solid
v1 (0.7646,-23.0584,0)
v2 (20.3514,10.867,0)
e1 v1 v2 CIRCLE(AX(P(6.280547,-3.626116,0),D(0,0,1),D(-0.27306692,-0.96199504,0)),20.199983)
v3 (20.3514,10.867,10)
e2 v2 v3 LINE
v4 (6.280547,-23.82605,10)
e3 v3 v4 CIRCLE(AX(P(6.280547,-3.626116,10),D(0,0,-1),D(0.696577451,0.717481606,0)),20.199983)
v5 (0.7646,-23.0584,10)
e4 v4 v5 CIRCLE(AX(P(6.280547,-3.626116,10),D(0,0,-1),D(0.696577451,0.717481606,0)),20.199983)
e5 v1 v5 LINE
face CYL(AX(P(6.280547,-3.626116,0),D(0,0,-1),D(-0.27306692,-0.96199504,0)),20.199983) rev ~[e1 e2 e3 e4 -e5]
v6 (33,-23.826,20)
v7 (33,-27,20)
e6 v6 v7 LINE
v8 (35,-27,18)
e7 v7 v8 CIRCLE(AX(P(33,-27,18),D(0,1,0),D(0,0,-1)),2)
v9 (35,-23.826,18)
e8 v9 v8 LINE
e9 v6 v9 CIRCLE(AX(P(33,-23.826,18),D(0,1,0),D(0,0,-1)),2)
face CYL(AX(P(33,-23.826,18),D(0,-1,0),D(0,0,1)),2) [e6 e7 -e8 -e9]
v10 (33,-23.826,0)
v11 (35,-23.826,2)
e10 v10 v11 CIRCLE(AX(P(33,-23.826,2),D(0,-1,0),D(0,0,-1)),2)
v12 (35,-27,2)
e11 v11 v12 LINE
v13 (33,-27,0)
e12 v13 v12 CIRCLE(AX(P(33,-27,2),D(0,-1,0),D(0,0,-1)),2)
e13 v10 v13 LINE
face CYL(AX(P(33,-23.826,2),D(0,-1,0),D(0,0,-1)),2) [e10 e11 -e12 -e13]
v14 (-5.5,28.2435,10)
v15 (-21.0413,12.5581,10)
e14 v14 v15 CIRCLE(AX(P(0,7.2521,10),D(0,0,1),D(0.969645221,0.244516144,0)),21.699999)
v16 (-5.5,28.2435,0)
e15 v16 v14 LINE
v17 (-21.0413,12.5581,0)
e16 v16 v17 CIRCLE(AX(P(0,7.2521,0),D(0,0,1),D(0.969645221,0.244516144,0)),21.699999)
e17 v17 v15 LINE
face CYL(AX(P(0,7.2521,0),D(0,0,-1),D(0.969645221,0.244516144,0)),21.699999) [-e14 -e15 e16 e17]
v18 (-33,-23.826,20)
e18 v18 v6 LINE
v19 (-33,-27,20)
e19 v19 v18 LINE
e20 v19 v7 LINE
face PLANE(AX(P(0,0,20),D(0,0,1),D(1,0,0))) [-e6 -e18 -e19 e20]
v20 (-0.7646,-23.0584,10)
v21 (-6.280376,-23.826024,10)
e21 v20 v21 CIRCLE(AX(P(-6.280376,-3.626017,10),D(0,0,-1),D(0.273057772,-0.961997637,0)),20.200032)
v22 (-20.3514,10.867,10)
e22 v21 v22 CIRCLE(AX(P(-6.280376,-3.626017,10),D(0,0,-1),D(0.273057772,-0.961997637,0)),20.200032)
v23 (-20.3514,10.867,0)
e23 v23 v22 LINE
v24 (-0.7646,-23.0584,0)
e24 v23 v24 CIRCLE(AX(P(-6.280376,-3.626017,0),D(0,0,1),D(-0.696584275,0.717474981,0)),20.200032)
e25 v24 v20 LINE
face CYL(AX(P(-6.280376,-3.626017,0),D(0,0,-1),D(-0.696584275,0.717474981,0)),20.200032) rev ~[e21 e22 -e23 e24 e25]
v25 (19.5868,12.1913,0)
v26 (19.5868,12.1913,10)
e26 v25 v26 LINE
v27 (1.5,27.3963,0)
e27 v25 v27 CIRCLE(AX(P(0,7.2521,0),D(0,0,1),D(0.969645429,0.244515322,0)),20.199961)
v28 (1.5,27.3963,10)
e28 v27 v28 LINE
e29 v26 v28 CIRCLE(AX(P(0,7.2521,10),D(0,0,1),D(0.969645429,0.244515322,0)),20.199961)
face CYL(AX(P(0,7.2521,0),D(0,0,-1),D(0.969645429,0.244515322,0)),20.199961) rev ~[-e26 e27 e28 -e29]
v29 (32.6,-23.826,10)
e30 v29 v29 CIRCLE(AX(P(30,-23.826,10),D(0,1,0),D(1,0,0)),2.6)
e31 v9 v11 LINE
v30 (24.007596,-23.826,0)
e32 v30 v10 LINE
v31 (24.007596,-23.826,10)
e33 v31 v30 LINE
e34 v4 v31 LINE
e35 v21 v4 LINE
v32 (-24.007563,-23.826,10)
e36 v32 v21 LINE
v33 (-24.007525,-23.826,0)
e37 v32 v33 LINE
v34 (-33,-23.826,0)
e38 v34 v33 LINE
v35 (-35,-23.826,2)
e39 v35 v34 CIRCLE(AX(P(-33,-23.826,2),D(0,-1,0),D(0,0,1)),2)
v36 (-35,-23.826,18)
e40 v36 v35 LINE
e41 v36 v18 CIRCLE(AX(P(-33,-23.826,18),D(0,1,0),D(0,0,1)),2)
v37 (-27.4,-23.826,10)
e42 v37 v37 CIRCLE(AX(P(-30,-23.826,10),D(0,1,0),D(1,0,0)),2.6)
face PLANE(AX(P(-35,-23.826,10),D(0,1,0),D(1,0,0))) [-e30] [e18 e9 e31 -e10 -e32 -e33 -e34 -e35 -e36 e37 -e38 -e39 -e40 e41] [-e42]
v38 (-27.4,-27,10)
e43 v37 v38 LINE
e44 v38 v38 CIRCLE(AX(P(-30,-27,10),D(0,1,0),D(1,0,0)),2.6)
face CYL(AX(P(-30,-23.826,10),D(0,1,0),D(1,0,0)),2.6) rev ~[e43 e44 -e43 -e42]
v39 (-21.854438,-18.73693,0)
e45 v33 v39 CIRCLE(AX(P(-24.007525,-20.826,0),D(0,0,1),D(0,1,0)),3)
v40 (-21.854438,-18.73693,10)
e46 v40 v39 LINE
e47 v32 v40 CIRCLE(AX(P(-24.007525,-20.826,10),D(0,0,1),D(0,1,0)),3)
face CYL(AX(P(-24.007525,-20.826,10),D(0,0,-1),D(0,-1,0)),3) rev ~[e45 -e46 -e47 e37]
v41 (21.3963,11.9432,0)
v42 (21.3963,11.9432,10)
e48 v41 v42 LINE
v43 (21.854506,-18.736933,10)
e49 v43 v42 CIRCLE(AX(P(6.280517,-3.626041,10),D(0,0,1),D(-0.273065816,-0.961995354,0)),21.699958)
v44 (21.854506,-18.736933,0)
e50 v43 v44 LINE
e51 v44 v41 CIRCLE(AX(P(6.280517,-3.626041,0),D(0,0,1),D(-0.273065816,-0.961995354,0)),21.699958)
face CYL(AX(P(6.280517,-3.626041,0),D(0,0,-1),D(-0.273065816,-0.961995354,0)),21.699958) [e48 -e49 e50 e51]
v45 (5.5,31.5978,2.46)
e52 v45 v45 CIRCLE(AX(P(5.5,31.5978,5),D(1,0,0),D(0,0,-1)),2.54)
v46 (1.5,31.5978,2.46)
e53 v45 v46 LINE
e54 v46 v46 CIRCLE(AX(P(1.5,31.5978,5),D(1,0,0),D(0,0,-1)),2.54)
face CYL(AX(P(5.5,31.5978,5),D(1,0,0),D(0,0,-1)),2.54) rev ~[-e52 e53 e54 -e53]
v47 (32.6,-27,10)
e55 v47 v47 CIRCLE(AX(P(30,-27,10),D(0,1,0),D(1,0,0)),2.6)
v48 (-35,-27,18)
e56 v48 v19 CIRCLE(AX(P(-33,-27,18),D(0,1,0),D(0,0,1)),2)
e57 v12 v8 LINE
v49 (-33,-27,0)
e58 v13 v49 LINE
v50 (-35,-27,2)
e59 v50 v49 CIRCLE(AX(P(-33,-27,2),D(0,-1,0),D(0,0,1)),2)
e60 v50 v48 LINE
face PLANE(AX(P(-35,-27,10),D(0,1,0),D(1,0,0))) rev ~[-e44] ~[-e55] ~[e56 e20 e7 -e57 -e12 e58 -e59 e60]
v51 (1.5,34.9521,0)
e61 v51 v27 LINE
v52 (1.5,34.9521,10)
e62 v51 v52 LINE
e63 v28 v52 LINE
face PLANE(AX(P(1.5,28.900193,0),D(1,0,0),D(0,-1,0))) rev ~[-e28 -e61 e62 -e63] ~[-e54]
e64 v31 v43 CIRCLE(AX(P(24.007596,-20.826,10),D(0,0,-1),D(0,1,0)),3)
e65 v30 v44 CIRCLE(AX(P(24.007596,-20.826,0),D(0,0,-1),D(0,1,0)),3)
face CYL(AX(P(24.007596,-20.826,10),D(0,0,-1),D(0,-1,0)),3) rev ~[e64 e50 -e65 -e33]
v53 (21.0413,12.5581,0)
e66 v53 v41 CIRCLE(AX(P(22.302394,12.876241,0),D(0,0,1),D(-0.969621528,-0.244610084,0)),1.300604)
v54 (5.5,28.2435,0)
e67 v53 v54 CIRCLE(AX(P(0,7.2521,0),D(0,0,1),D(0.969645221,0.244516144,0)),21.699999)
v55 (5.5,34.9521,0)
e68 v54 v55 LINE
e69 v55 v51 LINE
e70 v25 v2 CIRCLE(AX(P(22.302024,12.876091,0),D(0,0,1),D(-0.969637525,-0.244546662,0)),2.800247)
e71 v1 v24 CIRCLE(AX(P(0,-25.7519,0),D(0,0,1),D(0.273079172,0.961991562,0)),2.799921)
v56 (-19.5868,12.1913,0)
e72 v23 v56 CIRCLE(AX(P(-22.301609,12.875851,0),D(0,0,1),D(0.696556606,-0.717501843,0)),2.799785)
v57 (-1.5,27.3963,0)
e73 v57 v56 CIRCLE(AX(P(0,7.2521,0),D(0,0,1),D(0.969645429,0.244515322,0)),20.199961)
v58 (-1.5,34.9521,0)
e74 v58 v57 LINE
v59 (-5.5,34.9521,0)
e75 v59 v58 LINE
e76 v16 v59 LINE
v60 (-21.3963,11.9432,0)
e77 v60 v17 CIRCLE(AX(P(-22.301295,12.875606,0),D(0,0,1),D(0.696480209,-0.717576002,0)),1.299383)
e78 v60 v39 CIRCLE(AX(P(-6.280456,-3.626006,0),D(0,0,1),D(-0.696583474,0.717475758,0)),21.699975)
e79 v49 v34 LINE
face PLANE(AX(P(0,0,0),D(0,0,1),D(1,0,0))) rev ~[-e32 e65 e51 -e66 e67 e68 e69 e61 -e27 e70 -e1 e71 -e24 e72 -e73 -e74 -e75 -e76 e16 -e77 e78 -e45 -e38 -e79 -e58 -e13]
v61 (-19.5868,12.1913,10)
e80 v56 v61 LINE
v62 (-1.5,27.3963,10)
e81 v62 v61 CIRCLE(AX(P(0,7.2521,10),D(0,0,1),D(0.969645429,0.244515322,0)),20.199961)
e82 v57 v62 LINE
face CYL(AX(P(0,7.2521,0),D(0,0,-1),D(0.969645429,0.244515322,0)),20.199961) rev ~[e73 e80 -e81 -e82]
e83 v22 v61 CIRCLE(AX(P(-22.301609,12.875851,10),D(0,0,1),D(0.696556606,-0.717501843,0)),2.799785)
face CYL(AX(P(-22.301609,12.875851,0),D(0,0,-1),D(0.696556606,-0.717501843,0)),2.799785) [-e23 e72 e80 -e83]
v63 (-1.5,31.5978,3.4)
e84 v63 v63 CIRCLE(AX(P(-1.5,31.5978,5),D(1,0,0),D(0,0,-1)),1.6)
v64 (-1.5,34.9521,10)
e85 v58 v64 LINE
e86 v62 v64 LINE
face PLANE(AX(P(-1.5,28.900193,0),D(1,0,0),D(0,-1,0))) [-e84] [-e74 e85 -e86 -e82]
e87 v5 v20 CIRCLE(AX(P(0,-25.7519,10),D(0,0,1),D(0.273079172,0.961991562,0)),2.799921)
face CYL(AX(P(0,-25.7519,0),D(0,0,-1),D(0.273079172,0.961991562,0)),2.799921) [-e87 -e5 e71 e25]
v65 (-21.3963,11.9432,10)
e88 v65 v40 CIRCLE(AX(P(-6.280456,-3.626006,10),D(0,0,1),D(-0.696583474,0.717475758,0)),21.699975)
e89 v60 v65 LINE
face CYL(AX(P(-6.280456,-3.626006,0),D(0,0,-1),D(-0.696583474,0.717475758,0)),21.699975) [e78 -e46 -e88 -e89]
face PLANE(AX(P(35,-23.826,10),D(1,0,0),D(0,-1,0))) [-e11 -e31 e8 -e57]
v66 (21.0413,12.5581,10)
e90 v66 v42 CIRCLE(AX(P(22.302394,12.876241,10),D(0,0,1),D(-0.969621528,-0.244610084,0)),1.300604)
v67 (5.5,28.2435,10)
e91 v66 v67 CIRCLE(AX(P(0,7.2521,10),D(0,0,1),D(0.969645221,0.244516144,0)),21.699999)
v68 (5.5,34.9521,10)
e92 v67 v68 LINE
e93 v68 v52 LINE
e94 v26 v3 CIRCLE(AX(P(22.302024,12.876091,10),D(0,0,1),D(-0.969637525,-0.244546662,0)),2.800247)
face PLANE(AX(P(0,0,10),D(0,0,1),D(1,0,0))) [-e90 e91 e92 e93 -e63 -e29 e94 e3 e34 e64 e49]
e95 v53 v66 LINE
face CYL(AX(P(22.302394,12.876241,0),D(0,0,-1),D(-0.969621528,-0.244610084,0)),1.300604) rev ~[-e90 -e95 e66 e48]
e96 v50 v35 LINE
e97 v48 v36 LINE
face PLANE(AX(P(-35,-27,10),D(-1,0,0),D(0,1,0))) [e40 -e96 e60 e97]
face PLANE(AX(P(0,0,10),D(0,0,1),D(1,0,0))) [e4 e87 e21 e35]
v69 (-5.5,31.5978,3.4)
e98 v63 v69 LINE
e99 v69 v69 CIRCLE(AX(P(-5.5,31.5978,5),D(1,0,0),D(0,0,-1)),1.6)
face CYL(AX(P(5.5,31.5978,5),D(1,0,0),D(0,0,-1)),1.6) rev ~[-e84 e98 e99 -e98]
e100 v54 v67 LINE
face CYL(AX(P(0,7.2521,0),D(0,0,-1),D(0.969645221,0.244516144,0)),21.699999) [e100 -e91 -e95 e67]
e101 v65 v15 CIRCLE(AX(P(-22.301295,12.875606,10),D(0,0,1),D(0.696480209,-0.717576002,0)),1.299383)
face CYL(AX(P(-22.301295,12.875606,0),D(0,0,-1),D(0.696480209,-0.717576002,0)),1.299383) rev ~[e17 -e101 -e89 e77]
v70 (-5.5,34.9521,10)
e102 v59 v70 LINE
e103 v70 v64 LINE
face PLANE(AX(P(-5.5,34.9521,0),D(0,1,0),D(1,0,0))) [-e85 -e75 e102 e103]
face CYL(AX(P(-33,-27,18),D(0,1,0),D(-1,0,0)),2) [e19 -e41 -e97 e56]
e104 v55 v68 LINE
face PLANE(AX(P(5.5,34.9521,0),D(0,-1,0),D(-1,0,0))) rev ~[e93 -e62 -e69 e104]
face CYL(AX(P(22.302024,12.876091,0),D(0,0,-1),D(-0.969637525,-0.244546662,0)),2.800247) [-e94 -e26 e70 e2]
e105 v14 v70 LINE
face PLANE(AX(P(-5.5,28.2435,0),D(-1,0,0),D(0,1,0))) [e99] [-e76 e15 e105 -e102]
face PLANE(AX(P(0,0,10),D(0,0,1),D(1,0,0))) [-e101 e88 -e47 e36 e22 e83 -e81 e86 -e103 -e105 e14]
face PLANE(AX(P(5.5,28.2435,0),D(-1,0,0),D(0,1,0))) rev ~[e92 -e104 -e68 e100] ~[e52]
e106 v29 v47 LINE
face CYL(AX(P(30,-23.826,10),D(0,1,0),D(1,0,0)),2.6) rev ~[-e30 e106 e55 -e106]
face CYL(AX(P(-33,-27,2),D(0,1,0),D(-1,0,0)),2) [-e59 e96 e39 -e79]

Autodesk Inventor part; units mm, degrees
ref_plane "YZ Plane" through (0, 0, 0) normal (1, 0, 0) x (0, 1, 0)
ref_plane "XZ Plane" through (0, 0, 0) normal (0, 1, 0) x (-1, 0, 0)
ref_plane "XY Plane" through (0, 0, 0) normal (0, 0, 1) x (1, 0, 0)
sketch "Block1" plane through (0, 0, 0) normal (0, 0, 1) x (1, 0, 0)
  arc A0 (0.8192, -22.866) -> (-0.8192, -22.866) centre (0, -25.7519) ccw construction
  arc A1 (-20.2121, 10.7235) -> (-19.3929, 12.1424) centre (-22.3018, 12.876) ccw construction
  circle A2 centre (21.4359, -12.376) radius 1.25 construction
  circle A3 centre (22.4424, 3.0852) radius 1.25 construction
  arc A4 (0.8192, -22.866) -> (20.2121, 10.7235) centre (6.2805, -3.626) ccw construction
  circle A5 centre (-8.5493, -20.9783) radius 1.25 construction
  circle A6 centre (8.5493, -20.9783) radius 1.25 construction
  circle A7 centre (-22.4424, 3.0852) radius 1.25 construction
  arc A8 (-20.2121, 10.7235) -> (-0.8192, -22.866) centre (-6.2805, -3.626) ccw construction
  circle A9 centre (-21.4359, -12.376) radius 1.25 construction
  arc A10 (19.3929, 12.1424) -> (20.2121, 10.7235) centre (22.3018, 12.876) ccw construction
  arc A11 (19.3929, 12.1424) -> (-19.3929, 12.1424) centre (0, 7.2521) ccw construction
  circle A12 centre (-13.8931, 17.8931) radius 1.25 construction
  circle A13 centre (13.8931, 17.8931) radius 1.25 construction
  circle A14 centre (0, 24.7521) radius 1.25 construction
  arc A15 (19.5868, 12.1913) -> (-19.5868, 12.1913) centre (0, 7.2521) ccw
  arc A16 (19.5868, 12.1913) -> (20.3514, 10.867) centre (22.3018, 12.876) ccw
  arc A17 (0.7646, -23.0584) -> (20.3514, 10.867) centre (6.2805, -3.626) ccw
  arc A18 (0.7646, -23.0584) -> (-0.7646, -23.0584) centre (0, -25.7519) ccw
  arc A19 (-20.3514, 10.867) -> (-0.7646, -23.0584) centre (-6.2805, -3.626) ccw
  arc A20 (-20.3514, 10.867) -> (-19.5868, 12.1913) centre (-22.3018, 12.876) ccw
  arc A21 (0.355, -24.5013) -> (-0.355, -24.5013) centre (0, -25.7519) ccw
  arc A22 (0.355, -24.5013) -> (21.3963, 11.9432) centre (6.2805, -3.626) ccw
  arc A23 (21.0413, 12.5581) -> (21.3963, 11.9432) centre (22.3018, 12.876) ccw
  arc A24 (21.0413, 12.5581) -> (-21.0413, 12.5581) centre (0, 7.2521) ccw
  arc A25 (-21.3963, 11.9432) -> (-21.0413, 12.5581) centre (-22.3018, 12.876) ccw
  arc A26 (-21.3963, 11.9432) -> (-0.355, -24.5013) centre (-6.2805, -3.626) ccw
  line L0 (-5.5, 28.2435) -> (-5.5, 34.9521)
  line L1 (-5.5, 34.9521) -> (-1.5, 34.9521)
  line L2 (-1.5, 34.9521) -> (-1.5, 27.3963)
  line L3 (0, 24.7521) -> (0, 36.4403) construction
  line L4 (5.5, 28.2435) -> (5.5, 34.9521)
  line L5 (5.5, 34.9521) -> (1.5, 34.9521)
  line L6 (1.5, 34.9521) -> (1.5, 27.3963)
  point P0 (0, 0)
  dimension "d0" = 0.2
  dimension "d1" = 1.5
  dimension "d2" = 1.5
  dimension "d3" = 4
  dimension "d4" = 6
sketch "Sketch2" plane through (0, 0, 0) normal (0, 0, 1) x (1, 0, 0)
  line L0 (-6.2805, -3.626) -> (0, 7.2521) construction
  line L1 (0, 7.2521) -> (6.2805, -3.626) construction
  line L2 (6.2805, -3.626) -> (-6.2805, -3.626) construction
  line L3 (-3.1402, 1.813) -> (0, 0) construction
  line L4 (0, 0) -> (3.1402, 1.813) construction
  line L5 (0, 0) -> (0, -3.626) construction
  arc A0 (0.8192, -22.866) -> (-0.8192, -22.866) centre (0, -25.7519) ccw construction
  arc A1 (-20.2121, 10.7235) -> (-19.3929, 12.1424) centre (-22.3018, 12.876) ccw construction
  circle A2 centre (21.4359, -12.376) radius 1.25 construction
  circle A3 centre (22.4424, 3.0852) radius 1.25 construction
  arc A4 (0.8192, -22.866) -> (20.2121, 10.7235) centre (6.2805, -3.626) ccw construction
  circle A5 centre (-8.5493, -20.9783) radius 1.25 construction
  circle A6 centre (8.5493, -20.9783) radius 1.25 construction
  circle A7 centre (-22.4424, 3.0852) radius 1.25 construction
  arc A8 (-20.2121, 10.7235) -> (-0.8192, -22.866) centre (-6.2805, -3.626) ccw construction
  circle A9 centre (-21.4359, -12.376) radius 1.25 construction
  arc A10 (19.3929, 12.1424) -> (20.2121, 10.7235) centre (22.3018, 12.876) ccw construction
  arc A11 (19.3929, 12.1424) -> (-19.3929, 12.1424) centre (0, 7.2521) ccw construction
  circle A12 centre (-13.8931, 17.8931) radius 1.25 construction
  circle A13 centre (13.8931, 17.8931) radius 1.25 construction
  circle A14 centre (0, 24.7521) radius 1.25 construction
  arc A15 (19.5868, 12.1913) -> (-19.5868, 12.1913) centre (0, 7.2521) ccw
  arc A16 (19.5868, 12.1913) -> (20.3514, 10.867) centre (22.3018, 12.876) ccw
  arc A17 (0.7646, -23.0584) -> (20.3514, 10.867) centre (6.2805, -3.626) ccw
  arc A18 (0.7646, -23.0584) -> (-0.7646, -23.0584) centre (0, -25.7519) ccw
  arc A19 (-20.3514, 10.867) -> (-0.7646, -23.0584) centre (-6.2805, -3.626) ccw
  arc A20 (-20.3514, 10.867) -> (-19.5868, 12.1913) centre (-22.3018, 12.876) ccw
  arc A21 (0.355, -24.5013) -> (-0.355, -24.5013) centre (0, -25.7519) ccw
  arc A22 (0.355, -24.5013) -> (21.3963, 11.9432) centre (6.2805, -3.626) ccw
  arc A23 (21.0413, 12.5581) -> (21.3963, 11.9432) centre (22.3018, 12.876) ccw
  arc A24 (21.0413, 12.5581) -> (-21.0413, 12.5581) centre (0, 7.2521) ccw
  arc A25 (-21.3963, 11.9432) -> (-21.0413, 12.5581) centre (-22.3018, 12.876) ccw
  arc A26 (-21.3963, 11.9432) -> (-0.355, -24.5013) centre (-6.2805, -3.626) ccw
  line L6 (-5.5, 28.2435) -> (-5.5, 34.9521)
  line L7 (-5.5, 34.9521) -> (-1.5, 34.9521)
  line L8 (-1.5, 34.9521) -> (-1.5, 27.3963)
  line L9 (0, 24.7521) -> (0, 36.4403) construction
  line L10 (5.5, 28.2435) -> (5.5, 34.9521)
  line L11 (5.5, 34.9521) -> (1.5, 34.9521)
  line L12 (1.5, 34.9521) -> (1.5, 27.3963)
extrude "Extrusion1" add sketch "Sketch2" along normal blind 10 contours A15 L12 A24 A23 A22 A21 A26 A25 L8 A20 A19 A18 A17 A16 | L12 L11 L10 A24 | A24 L6 L7 L8
sketch "Sketch3" plane through (5.5, 28.2435, 0) normal (1, 0, 0) x (0, 0, -1)
  line L0 (0, 6.7086) -> (-10, 6.7086) construction
  line L1 (-5, 6.7086) -> (-5, 0) construction
  line L2 (0, 0) -> (-10, 0) construction
  circle A0 centre (-5, 3.3543) radius 1.6
  point P0 (0, -28.2435)
  dimension "d7" = 3.2
extrude "Extrusion2" cut sketch "Sketch3" against normal through all
sketch "Sketch4" plane through (0, 0, 10) normal (0, 0, 1) x (1, 0, 0)
  line L0 (35, -27) -> (-35, -27)
  line L1 (-35, -27) -> (-35, -23.826)
  line L2 (-35, -23.826) -> (35, -23.826)
  line L3 (35, -23.826) -> (35, -27)
  arc A0 (-20.3514, 10.867) -> (-0.7646, -23.0584) centre (-6.2805, -3.626) ccw construction
  arc A1 (0.355, -24.5013) -> (-0.355, -24.5013) centre (0, -25.7519) ccw projected
  line L4 (0, -25.7519) -> (0, -23.826) construction
  point P0 (0, 0)
  dimension "d11" = 35
  dimension "d12" = 35
  dimension "d26" = 27
extrude "Extrusion3" add sketch "Sketch4" against normal up to surface (10 mm away)
fillet "Fillet1" radius 3 2 edges at (-14.2083, -23.826, 5) (14.2083, -23.826, 5)
sketch "Sketch6" plane through (0, 0, 10) normal (0, 0, 1) x (1, 0, 0)
  line L0 (-35, -27) -> (35, -27) projected
  line L1 (-35, -23.826) -> (-24.0076, -23.826) projected
  line L2 (35, -27) -> (-35, -27)
  line L3 (-35, -27) -> (-35, -23.826)
  line L4 (-35, -23.826) -> (35, -23.826)
  line L5 (35, -23.826) -> (35, -27)
  point P0 (0, 0)
extrude "Extrusion5" add sketch "Sketch6" along normal blind 10
sketch "Sketch5" plane through (35, -23.826, 10) normal (0, 1, 0) x (1, 0, 0)
  line L0 (0, 0) -> (-5, 0) construction
  circle A0 centre (-5, 0) radius 2.6
  line L1 (-70, 0) -> (-65, 0) construction
  circle A1 centre (-65, 0) radius 2.6
  line L2 (0, 10) -> (0, -10) projected
  line L3 (-70, -10) -> (-70, 10) projected
  point P0 (-35, 10)
  dimension "d16" = 5
  dimension "d17" = 5.2
extrude "Extrusion4" cut sketch "Sketch5" against normal blind 10
fillet "Fillet2" radius 2 4 edges at (35, -25.413, 0) (-35, -25.413, 0) (-35, -25.413, 20) (35, -25.413, 20)
sketch "Sketch7" plane through (5.5, 28.2435, 0) normal (1, 0, 0) x (0, 0, -1)
  circle A0 centre (-5, 3.3543) radius 1.6 projected
  circle A1 centre (-5, 3.3543) radius 2.54
  point P0 (0, -28.2435)
  dimension "d23" = 5.08
extrude "Extrusion6" cut sketch "Sketch7" against normal up to surface (4 mm away) contours A0 | A1
equation "\"d12\" = d11"
properties part number "MotorTestBracket"
